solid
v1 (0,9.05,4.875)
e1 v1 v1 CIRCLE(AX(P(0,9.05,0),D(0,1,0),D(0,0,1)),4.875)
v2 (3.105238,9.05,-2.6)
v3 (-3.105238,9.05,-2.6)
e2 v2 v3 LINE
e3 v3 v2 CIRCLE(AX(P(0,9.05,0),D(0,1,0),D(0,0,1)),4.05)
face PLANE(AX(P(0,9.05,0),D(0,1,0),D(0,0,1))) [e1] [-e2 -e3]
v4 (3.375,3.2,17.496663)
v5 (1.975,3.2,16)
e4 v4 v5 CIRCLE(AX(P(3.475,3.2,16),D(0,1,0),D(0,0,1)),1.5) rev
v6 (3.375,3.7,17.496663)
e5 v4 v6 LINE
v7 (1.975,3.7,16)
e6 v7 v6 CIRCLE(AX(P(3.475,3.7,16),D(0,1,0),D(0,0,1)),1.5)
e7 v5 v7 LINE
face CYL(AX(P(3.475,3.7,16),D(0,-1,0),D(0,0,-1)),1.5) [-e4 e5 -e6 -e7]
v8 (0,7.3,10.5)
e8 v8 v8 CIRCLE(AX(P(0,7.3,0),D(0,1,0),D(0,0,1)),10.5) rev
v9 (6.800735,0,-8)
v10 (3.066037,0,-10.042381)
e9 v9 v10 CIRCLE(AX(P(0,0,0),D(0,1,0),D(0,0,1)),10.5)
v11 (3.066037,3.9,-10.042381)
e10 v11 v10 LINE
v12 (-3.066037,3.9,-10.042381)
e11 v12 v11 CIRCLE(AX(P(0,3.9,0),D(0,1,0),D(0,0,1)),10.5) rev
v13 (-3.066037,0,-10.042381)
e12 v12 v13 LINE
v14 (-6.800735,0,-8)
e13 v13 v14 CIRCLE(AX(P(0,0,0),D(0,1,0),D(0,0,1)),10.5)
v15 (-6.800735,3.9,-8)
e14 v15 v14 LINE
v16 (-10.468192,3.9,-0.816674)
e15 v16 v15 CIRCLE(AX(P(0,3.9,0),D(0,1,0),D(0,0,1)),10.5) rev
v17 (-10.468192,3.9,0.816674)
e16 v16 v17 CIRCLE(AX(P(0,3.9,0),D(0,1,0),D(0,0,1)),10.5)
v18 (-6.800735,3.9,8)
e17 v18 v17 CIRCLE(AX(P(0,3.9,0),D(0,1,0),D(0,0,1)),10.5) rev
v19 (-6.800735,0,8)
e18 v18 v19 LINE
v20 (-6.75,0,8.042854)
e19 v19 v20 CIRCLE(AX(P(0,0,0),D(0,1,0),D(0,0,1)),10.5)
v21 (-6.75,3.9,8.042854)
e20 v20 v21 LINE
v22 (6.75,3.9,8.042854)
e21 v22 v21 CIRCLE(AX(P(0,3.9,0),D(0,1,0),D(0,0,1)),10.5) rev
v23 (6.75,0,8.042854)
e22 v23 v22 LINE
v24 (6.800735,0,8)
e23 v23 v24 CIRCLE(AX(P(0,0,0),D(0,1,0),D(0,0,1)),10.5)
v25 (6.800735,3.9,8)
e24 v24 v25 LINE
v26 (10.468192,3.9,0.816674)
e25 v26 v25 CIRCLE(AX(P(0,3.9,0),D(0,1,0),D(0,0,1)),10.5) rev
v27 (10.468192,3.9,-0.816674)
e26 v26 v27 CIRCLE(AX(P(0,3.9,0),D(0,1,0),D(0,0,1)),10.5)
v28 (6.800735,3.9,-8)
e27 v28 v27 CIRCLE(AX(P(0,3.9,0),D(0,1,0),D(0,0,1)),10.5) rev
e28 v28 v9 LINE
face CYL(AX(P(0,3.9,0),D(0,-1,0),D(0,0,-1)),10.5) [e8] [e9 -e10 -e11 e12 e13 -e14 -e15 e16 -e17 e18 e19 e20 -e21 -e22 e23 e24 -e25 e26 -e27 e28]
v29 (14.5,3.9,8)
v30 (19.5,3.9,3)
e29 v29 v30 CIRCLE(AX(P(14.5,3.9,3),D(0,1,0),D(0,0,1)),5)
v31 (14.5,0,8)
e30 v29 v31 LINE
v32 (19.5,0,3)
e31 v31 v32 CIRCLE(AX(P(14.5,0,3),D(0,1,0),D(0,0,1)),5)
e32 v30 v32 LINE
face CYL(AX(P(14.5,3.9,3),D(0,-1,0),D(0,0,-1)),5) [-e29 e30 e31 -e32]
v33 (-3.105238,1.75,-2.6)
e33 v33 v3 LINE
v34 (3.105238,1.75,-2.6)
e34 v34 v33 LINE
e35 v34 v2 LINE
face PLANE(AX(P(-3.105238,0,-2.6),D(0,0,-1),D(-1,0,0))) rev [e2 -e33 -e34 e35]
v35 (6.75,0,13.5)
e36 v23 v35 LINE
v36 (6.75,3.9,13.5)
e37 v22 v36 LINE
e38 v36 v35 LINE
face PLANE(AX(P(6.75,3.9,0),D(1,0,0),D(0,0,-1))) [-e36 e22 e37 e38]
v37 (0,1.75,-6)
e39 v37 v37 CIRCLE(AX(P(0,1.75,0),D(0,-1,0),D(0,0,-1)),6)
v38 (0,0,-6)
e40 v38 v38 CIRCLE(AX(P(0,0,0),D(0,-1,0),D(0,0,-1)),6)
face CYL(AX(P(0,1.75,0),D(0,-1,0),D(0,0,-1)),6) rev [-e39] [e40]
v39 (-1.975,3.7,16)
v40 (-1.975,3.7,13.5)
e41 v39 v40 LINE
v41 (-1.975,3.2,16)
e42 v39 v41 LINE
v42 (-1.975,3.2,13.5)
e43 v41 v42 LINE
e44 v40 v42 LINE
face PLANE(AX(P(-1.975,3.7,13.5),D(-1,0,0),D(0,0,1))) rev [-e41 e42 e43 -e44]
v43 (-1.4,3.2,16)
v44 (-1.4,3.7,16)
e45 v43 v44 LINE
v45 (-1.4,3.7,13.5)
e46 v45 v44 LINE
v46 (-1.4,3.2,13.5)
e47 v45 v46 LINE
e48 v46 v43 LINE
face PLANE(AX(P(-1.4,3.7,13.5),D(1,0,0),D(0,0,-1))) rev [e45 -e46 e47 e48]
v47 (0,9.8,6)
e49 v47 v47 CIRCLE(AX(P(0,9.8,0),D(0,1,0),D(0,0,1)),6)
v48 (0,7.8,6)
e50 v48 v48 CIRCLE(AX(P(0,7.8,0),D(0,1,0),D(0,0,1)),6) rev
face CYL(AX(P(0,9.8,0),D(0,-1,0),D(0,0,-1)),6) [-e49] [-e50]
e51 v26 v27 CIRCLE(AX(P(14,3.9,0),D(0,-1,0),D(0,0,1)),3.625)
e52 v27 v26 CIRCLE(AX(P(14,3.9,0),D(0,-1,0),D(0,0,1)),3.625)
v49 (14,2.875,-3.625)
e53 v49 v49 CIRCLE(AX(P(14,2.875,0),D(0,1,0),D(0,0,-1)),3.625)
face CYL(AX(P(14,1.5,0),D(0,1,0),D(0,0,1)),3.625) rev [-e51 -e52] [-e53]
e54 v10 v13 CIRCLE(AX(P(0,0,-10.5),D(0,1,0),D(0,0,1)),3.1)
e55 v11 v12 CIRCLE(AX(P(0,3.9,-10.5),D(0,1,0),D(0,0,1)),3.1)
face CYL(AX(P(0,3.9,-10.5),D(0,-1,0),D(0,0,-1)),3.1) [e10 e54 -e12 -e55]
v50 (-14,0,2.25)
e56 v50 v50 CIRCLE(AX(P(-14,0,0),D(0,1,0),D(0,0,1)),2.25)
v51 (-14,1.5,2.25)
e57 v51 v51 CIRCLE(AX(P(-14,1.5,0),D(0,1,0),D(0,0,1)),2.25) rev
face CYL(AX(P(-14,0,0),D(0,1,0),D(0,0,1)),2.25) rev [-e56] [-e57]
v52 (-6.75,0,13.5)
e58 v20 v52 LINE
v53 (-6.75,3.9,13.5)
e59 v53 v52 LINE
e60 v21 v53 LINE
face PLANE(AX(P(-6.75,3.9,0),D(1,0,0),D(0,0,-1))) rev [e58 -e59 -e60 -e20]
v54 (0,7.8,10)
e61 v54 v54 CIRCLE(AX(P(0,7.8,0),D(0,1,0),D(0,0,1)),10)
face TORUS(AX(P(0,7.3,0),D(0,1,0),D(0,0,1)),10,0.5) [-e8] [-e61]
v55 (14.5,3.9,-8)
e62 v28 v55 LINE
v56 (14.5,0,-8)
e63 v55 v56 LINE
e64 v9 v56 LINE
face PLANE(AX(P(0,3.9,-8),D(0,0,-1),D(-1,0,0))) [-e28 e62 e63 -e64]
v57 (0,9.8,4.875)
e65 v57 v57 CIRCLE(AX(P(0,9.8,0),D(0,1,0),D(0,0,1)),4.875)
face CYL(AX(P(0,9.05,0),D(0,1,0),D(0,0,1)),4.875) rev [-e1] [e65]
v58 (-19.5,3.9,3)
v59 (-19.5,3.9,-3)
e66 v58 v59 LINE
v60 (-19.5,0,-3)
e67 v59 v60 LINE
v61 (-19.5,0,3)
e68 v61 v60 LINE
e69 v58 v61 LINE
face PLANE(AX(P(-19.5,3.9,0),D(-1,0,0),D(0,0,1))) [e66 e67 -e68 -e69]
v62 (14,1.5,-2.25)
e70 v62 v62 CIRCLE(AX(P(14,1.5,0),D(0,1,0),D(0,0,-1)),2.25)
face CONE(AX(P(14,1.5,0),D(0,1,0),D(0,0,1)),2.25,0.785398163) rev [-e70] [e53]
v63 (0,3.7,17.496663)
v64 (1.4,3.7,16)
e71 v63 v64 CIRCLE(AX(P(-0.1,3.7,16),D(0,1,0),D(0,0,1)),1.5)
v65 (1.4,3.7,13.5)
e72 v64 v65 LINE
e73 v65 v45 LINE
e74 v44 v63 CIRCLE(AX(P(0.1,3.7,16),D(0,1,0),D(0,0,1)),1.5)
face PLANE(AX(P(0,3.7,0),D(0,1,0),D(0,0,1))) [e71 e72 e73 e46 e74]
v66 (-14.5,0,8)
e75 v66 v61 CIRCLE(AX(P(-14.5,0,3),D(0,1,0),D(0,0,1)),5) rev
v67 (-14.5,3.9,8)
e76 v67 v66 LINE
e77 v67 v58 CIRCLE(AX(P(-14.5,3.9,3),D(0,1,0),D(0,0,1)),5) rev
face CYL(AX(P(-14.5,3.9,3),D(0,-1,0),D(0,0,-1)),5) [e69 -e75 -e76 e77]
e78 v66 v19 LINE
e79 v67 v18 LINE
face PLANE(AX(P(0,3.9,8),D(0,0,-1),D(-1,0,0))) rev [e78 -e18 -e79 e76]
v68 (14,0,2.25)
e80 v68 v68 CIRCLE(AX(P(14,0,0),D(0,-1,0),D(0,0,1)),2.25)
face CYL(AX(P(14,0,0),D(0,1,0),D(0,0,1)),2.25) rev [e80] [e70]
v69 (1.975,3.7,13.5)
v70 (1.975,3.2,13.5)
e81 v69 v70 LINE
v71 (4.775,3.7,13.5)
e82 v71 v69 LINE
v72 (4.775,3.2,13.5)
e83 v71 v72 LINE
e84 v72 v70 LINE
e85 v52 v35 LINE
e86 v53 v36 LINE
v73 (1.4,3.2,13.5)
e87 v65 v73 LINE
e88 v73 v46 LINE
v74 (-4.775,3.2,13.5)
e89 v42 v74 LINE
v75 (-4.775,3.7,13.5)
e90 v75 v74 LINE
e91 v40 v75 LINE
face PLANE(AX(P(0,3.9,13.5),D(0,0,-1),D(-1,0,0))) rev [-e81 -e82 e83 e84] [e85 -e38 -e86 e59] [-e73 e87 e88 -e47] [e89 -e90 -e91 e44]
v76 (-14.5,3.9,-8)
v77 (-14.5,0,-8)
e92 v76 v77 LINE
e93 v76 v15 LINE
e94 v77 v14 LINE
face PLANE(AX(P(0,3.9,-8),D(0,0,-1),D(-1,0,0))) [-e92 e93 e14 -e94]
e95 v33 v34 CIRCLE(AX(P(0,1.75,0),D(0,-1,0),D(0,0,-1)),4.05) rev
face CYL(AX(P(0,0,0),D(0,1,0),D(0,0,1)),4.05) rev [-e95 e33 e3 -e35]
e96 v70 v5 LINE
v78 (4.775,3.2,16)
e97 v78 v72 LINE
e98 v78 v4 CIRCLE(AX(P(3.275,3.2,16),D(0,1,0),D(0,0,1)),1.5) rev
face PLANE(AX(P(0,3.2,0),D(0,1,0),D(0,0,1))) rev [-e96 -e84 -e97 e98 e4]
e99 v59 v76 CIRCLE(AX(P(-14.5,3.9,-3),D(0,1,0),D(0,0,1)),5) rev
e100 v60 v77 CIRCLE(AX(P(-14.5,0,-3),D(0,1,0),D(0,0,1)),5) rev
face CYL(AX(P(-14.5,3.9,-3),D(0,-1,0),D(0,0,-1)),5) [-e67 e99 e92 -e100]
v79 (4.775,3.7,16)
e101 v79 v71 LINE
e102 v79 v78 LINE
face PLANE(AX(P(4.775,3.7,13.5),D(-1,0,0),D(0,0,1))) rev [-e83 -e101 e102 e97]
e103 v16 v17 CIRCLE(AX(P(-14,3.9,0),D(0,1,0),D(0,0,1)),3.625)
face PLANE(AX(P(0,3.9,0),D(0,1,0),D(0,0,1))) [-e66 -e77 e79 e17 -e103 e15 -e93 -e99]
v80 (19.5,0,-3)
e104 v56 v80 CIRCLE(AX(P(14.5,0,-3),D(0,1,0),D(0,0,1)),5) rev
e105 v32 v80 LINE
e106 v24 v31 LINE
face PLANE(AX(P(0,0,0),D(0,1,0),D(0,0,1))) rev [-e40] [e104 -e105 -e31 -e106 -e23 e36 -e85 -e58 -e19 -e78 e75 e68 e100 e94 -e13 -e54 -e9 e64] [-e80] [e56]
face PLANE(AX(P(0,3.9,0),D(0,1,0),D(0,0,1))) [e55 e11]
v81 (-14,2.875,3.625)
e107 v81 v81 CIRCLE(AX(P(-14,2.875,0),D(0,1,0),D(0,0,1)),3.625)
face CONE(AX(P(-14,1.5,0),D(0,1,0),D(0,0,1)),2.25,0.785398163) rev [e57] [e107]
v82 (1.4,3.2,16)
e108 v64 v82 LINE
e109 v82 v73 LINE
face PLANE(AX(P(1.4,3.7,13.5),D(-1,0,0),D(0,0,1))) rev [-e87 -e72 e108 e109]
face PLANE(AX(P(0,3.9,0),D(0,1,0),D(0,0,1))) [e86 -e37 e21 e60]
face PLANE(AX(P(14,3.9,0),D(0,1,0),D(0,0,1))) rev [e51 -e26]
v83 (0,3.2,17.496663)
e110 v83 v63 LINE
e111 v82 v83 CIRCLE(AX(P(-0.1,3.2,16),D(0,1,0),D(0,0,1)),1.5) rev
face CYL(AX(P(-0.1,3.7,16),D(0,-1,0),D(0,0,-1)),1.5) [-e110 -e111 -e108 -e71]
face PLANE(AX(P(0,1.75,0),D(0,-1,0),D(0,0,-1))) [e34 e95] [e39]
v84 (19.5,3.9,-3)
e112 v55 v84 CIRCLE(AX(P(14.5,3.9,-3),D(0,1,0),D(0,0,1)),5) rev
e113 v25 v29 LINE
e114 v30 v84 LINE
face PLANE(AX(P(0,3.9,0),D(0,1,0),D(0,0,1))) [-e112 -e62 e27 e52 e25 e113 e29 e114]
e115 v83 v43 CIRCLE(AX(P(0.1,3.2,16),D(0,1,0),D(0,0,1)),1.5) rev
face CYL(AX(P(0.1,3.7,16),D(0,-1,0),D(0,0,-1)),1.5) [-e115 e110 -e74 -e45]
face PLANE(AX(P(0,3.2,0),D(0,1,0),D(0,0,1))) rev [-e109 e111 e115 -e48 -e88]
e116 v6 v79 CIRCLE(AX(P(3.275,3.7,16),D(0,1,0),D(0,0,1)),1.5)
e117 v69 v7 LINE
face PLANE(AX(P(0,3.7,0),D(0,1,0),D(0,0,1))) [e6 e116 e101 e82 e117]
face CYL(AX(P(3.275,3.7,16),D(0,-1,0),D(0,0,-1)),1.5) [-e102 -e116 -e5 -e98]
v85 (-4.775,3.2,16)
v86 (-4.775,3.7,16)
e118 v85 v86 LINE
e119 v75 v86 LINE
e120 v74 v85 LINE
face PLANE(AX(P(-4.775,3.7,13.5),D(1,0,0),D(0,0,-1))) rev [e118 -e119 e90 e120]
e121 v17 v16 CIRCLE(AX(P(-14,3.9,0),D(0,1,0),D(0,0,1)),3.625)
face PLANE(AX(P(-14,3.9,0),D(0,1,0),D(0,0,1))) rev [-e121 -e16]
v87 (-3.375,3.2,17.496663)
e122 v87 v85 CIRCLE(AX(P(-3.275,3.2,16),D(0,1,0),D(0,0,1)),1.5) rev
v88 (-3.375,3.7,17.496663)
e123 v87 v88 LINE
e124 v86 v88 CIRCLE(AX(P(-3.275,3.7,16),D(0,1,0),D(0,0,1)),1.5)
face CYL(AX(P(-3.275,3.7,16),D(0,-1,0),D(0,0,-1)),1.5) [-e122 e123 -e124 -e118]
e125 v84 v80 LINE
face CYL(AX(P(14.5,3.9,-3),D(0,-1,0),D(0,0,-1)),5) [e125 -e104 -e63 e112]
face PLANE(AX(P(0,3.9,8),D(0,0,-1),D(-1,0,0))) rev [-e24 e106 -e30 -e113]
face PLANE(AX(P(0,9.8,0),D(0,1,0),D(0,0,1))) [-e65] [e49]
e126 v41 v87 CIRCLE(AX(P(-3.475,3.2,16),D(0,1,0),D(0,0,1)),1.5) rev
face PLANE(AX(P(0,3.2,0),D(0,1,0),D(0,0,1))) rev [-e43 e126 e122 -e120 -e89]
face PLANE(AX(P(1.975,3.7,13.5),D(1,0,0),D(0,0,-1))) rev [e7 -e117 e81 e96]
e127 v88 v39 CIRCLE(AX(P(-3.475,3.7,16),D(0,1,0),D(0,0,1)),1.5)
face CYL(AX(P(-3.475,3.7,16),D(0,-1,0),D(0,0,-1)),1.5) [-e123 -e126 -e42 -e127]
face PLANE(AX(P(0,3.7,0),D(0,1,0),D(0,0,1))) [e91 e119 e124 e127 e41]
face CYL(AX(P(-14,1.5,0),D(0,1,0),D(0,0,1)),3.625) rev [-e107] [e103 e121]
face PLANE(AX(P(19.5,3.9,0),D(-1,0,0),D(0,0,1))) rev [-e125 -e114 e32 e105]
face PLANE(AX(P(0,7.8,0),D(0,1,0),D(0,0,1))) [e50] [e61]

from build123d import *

# Parameters (mm, degrees)
BOSS_EXTRUDE1_DEPTH = 3.9
SKETCH3_R           = 2.25
CUT_EXTRUDE1_DEPTH  = 25.091907
BOSS_EXTRUDE3_START = -3.9
SKETCH6_R           = 10.5
BOSS_EXTRUDE3_DEPTH = 7.8
SKETCH4_R           = 3.625
CUT_EXTRUDE2_DEPTH  = 2.4
BOSS_EXTRUDE4_START = -7.8
SKETCH7_R           = 6
BOSS_EXTRUDE4_DEPTH = 9.8
SKETCH8_R           = 4.875
CUT_EXTRUDE3_DEPTH  = 0.75
CUT_EXTRUDE4_DEPTH  = 26.438406
SKETCH10_R          = 6
CUT_EXTRUDE5_DEPTH  = 1.75
BOSS_EXTRUDE5_START = 3.2
SKETCH11_W          = 2.8
SKETCH11_H          = 4
BOSS_EXTRUDE5_DEPTH = 0.5
FILLET1_R           = 1.5
FILLET2_R           = 0.5


with BuildPart() as part:
    # Sketch2 → Boss-Extrude1 (new body)
    with BuildSketch(Plane(origin=(0, 0, 0), x_dir=(1, 0, 0), z_dir=(0, 1, 0))):
        with BuildLine():
            Line((-19.5, 3), (-19.5, -3))
            ThreePointArc((-19.5, -3), (-18.035534, -6.535534), (-14.5, -8))
            Line((-14.5, -8), (-6.75, -8))
            Line((-6.75, -8), (-6.75, -13.5))
            Line((-6.75, -13.5), (6.75, -13.5))
            Line((6.75, -13.5), (6.75, -8))
            Line((6.75, -8), (14.5, -8))
            ThreePointArc((14.5, -8), (18.035534, -6.535534), (19.5, -3))
            Line((19.5, -3), (19.5, 3))
            ThreePointArc((19.5, 3), (18.035534, 6.535534), (14.5, 8))
            Line((14.5, 8), (6.800735, 8))
            ThreePointArc((6.800735, 8), (5.037969, 9.21243), (3.066037, 10.042381))
            ThreePointArc((3.066037, 10.042381), (0, 13.6), (-3.066037, 10.042381))
            ThreePointArc((-3.066037, 10.042381), (-5.037969, 9.21243), (-6.800735, 8))
            Line((-6.800735, 8), (-14.5, 8))
            ThreePointArc((-14.5, 8), (-18.035534, 6.535534), (-19.5, 3))
        make_face()
    extrude(amount=BOSS_EXTRUDE1_DEPTH)

    # Sketch3 → Cut-Extrude1 (cut, through all)
    with BuildSketch(Plane(origin=(0, 3.9, 0), x_dir=(1, 0, 0), z_dir=(0, 1, 0))):
        with Locations(Location((-14, 0, 0), (0, 0, 270))):
            Circle(SKETCH3_R)
    cut_extrude1 = extrude(amount=-CUT_EXTRUDE1_DEPTH, mode=Mode.SUBTRACT)

    # Sketch6 → Boss-Extrude3 (add)
    with BuildSketch(Plane(origin=(0, 3.9, 0), x_dir=(1, 0, 0), z_dir=(0, 1, 0)).offset(BOSS_EXTRUDE3_START)):
        with Locations(Location((0, 0, 0), (0, 0, 73.022056))):
            Circle(SKETCH6_R)
    extrude(amount=BOSS_EXTRUDE3_DEPTH)

    # Sketch4 → Cut-Extrude2 (cut)
    with BuildSketch(Plane(origin=(0, 3.9, 0), x_dir=(1, 0, 0), z_dir=(0, 1, 0))):
        with Locations(Location((-14, 0, 0), (0, 0, 270))):
            Circle(SKETCH4_R)
    cut_extrude2 = extrude(amount=-CUT_EXTRUDE2_DEPTH, mode=Mode.SUBTRACT)

    # Sketch5 → Revolve1 (revolve)
    with BuildSketch(Plane.XY, mode=Mode.PRIVATE) as revolve1_sk:
        Polygon((-16.25, 1.5), (-17.625, 2.875), (-17.625, 1.5), align=None)
    revolve1 = revolve(revolve1_sk.sketch.rotate(Axis((-14, -999.202494, 0), (0, 1, 0)), 90), axis=Axis((-14, -999.202494, 0), (0, 1, 0)))

    # Mirror1: Cut-Extrude1, Cut-Extrude2, Revolve1 across plane
    add(cut_extrude1.mirror(Plane(origin=(0, 0, 0), x_dir=(0, 0, 1), z_dir=(1, 0, 0))), mode=Mode.SUBTRACT)
    add(cut_extrude2.mirror(Plane(origin=(0, 0, 0), x_dir=(0, 0, 1), z_dir=(1, 0, 0))), mode=Mode.SUBTRACT)
    add(revolve1.mirror(Plane(origin=(0, 0, 0), x_dir=(0, 0, 1), z_dir=(1, 0, 0))))

    # Sketch7 → Boss-Extrude4 (add)
    with BuildSketch(Plane(origin=(0, 7.8, 0), x_dir=(1, 0, 0), z_dir=(0, 1, 0)).offset(BOSS_EXTRUDE4_START)):
        with Locations(Location((0, 0, 0), (0, 0, 270))):
            Circle(SKETCH7_R)
    extrude(amount=BOSS_EXTRUDE4_DEPTH)

    # Sketch8 → Cut-Extrude3 (cut)
    with BuildSketch(Plane(origin=(0, 9.8, 0), x_dir=(1, 0, 0), z_dir=(0, 1, 0))):
        with Locations(Location((0, 0, 0), (0, 0, 270))):
            Circle(SKETCH8_R)
    extrude(amount=-CUT_EXTRUDE3_DEPTH, mode=Mode.SUBTRACT)

    # Sketch9 → Cut-Extrude4 (cut, through all)
    with BuildSketch(Plane(origin=(0, 9.05, 0), x_dir=(1, 0, 0), z_dir=(0, 1, 0))):
        with BuildLine():
            Line((-3.105238, 2.6), (3.105238, 2.6))
            ThreePointArc((3.105238, 2.6), (0, -4.05), (-3.105238, 2.6))
        make_face()
    extrude(amount=-CUT_EXTRUDE4_DEPTH, mode=Mode.SUBTRACT)

    # Sketch10 → Cut-Extrude5 (cut)
    with BuildSketch(Plane.XZ):
        with Locations(Location((0, 0, 0), (0, 0, 90))):
            Circle(SKETCH10_R)
    extrude(amount=-CUT_EXTRUDE5_DEPTH, mode=Mode.SUBTRACT)

    # Sketch11 → Boss-Extrude5 (add)
    with BuildSketch(Plane(origin=(0, 0, 0), x_dir=(1, 0, 0), z_dir=(0, 1, 0)).offset(BOSS_EXTRUDE5_START)):
        with Locations((-3.375, -15.5)):
            Rectangle(SKETCH11_W, SKETCH11_H)
        with Locations((0, -15.5)):
            Rectangle(SKETCH11_W, SKETCH11_H)
        with Locations((3.375, -15.5)):
            Rectangle(SKETCH11_W, SKETCH11_H)
    extrude(amount=BOSS_EXTRUDE5_DEPTH)

    # Fillet1
    # the kernel refuses this fillet: 1.5 mm, written as the material it takes off along each edge
    with BuildSketch(Plane(origin=(-4.775, -0.55, 17.5), x_dir=(0, 0, -1), z_dir=(0, 1, 0)), Plane(origin=(-1.4, -0.55, 17.5), x_dir=(0, 0, -1), z_dir=(0, 1, 0)), Plane(origin=(1.975, -0.55, 17.5), x_dir=(0, 0, -1), z_dir=(0, 1, 0))) as fillet1_piece_1:
        with BuildLine():
            CenterArc((FILLET1_R, -FILLET1_R), FILLET1_R, 90, 90)
            Line((0, -FILLET1_R), (0, 0))
            Line((0, 0), (FILLET1_R, 0))
        make_face()
    extrude(amount=8, mode=Mode.SUBTRACT)
    with BuildSketch(Plane(origin=(-1.975, -0.55, 17.5), x_dir=(0, 0, -1), z_dir=(0, 1, 0)), Plane(origin=(1.4, -0.55, 17.5), x_dir=(0, 0, -1), z_dir=(0, 1, 0)), Plane(origin=(4.775, -0.55, 17.5), x_dir=(0, 0, -1), z_dir=(0, 1, 0))) as fillet1_piece_2:
        with BuildLine():
            CenterArc((FILLET1_R, FILLET1_R), FILLET1_R, 180, 90)
            Line((0, FILLET1_R), (0, 0))
            Line((0, 0), (FILLET1_R, 0))
        make_face()
    extrude(amount=8, mode=Mode.SUBTRACT)

    # Fillet2
    fillet2_edges = [part.edges().sort_by_distance(p)[0] for p in [
        (-3.066037, 7.8, 10.042381),
    ]]
    fillet(fillet2_edges, radius=FILLET2_R)


solid = part.part
